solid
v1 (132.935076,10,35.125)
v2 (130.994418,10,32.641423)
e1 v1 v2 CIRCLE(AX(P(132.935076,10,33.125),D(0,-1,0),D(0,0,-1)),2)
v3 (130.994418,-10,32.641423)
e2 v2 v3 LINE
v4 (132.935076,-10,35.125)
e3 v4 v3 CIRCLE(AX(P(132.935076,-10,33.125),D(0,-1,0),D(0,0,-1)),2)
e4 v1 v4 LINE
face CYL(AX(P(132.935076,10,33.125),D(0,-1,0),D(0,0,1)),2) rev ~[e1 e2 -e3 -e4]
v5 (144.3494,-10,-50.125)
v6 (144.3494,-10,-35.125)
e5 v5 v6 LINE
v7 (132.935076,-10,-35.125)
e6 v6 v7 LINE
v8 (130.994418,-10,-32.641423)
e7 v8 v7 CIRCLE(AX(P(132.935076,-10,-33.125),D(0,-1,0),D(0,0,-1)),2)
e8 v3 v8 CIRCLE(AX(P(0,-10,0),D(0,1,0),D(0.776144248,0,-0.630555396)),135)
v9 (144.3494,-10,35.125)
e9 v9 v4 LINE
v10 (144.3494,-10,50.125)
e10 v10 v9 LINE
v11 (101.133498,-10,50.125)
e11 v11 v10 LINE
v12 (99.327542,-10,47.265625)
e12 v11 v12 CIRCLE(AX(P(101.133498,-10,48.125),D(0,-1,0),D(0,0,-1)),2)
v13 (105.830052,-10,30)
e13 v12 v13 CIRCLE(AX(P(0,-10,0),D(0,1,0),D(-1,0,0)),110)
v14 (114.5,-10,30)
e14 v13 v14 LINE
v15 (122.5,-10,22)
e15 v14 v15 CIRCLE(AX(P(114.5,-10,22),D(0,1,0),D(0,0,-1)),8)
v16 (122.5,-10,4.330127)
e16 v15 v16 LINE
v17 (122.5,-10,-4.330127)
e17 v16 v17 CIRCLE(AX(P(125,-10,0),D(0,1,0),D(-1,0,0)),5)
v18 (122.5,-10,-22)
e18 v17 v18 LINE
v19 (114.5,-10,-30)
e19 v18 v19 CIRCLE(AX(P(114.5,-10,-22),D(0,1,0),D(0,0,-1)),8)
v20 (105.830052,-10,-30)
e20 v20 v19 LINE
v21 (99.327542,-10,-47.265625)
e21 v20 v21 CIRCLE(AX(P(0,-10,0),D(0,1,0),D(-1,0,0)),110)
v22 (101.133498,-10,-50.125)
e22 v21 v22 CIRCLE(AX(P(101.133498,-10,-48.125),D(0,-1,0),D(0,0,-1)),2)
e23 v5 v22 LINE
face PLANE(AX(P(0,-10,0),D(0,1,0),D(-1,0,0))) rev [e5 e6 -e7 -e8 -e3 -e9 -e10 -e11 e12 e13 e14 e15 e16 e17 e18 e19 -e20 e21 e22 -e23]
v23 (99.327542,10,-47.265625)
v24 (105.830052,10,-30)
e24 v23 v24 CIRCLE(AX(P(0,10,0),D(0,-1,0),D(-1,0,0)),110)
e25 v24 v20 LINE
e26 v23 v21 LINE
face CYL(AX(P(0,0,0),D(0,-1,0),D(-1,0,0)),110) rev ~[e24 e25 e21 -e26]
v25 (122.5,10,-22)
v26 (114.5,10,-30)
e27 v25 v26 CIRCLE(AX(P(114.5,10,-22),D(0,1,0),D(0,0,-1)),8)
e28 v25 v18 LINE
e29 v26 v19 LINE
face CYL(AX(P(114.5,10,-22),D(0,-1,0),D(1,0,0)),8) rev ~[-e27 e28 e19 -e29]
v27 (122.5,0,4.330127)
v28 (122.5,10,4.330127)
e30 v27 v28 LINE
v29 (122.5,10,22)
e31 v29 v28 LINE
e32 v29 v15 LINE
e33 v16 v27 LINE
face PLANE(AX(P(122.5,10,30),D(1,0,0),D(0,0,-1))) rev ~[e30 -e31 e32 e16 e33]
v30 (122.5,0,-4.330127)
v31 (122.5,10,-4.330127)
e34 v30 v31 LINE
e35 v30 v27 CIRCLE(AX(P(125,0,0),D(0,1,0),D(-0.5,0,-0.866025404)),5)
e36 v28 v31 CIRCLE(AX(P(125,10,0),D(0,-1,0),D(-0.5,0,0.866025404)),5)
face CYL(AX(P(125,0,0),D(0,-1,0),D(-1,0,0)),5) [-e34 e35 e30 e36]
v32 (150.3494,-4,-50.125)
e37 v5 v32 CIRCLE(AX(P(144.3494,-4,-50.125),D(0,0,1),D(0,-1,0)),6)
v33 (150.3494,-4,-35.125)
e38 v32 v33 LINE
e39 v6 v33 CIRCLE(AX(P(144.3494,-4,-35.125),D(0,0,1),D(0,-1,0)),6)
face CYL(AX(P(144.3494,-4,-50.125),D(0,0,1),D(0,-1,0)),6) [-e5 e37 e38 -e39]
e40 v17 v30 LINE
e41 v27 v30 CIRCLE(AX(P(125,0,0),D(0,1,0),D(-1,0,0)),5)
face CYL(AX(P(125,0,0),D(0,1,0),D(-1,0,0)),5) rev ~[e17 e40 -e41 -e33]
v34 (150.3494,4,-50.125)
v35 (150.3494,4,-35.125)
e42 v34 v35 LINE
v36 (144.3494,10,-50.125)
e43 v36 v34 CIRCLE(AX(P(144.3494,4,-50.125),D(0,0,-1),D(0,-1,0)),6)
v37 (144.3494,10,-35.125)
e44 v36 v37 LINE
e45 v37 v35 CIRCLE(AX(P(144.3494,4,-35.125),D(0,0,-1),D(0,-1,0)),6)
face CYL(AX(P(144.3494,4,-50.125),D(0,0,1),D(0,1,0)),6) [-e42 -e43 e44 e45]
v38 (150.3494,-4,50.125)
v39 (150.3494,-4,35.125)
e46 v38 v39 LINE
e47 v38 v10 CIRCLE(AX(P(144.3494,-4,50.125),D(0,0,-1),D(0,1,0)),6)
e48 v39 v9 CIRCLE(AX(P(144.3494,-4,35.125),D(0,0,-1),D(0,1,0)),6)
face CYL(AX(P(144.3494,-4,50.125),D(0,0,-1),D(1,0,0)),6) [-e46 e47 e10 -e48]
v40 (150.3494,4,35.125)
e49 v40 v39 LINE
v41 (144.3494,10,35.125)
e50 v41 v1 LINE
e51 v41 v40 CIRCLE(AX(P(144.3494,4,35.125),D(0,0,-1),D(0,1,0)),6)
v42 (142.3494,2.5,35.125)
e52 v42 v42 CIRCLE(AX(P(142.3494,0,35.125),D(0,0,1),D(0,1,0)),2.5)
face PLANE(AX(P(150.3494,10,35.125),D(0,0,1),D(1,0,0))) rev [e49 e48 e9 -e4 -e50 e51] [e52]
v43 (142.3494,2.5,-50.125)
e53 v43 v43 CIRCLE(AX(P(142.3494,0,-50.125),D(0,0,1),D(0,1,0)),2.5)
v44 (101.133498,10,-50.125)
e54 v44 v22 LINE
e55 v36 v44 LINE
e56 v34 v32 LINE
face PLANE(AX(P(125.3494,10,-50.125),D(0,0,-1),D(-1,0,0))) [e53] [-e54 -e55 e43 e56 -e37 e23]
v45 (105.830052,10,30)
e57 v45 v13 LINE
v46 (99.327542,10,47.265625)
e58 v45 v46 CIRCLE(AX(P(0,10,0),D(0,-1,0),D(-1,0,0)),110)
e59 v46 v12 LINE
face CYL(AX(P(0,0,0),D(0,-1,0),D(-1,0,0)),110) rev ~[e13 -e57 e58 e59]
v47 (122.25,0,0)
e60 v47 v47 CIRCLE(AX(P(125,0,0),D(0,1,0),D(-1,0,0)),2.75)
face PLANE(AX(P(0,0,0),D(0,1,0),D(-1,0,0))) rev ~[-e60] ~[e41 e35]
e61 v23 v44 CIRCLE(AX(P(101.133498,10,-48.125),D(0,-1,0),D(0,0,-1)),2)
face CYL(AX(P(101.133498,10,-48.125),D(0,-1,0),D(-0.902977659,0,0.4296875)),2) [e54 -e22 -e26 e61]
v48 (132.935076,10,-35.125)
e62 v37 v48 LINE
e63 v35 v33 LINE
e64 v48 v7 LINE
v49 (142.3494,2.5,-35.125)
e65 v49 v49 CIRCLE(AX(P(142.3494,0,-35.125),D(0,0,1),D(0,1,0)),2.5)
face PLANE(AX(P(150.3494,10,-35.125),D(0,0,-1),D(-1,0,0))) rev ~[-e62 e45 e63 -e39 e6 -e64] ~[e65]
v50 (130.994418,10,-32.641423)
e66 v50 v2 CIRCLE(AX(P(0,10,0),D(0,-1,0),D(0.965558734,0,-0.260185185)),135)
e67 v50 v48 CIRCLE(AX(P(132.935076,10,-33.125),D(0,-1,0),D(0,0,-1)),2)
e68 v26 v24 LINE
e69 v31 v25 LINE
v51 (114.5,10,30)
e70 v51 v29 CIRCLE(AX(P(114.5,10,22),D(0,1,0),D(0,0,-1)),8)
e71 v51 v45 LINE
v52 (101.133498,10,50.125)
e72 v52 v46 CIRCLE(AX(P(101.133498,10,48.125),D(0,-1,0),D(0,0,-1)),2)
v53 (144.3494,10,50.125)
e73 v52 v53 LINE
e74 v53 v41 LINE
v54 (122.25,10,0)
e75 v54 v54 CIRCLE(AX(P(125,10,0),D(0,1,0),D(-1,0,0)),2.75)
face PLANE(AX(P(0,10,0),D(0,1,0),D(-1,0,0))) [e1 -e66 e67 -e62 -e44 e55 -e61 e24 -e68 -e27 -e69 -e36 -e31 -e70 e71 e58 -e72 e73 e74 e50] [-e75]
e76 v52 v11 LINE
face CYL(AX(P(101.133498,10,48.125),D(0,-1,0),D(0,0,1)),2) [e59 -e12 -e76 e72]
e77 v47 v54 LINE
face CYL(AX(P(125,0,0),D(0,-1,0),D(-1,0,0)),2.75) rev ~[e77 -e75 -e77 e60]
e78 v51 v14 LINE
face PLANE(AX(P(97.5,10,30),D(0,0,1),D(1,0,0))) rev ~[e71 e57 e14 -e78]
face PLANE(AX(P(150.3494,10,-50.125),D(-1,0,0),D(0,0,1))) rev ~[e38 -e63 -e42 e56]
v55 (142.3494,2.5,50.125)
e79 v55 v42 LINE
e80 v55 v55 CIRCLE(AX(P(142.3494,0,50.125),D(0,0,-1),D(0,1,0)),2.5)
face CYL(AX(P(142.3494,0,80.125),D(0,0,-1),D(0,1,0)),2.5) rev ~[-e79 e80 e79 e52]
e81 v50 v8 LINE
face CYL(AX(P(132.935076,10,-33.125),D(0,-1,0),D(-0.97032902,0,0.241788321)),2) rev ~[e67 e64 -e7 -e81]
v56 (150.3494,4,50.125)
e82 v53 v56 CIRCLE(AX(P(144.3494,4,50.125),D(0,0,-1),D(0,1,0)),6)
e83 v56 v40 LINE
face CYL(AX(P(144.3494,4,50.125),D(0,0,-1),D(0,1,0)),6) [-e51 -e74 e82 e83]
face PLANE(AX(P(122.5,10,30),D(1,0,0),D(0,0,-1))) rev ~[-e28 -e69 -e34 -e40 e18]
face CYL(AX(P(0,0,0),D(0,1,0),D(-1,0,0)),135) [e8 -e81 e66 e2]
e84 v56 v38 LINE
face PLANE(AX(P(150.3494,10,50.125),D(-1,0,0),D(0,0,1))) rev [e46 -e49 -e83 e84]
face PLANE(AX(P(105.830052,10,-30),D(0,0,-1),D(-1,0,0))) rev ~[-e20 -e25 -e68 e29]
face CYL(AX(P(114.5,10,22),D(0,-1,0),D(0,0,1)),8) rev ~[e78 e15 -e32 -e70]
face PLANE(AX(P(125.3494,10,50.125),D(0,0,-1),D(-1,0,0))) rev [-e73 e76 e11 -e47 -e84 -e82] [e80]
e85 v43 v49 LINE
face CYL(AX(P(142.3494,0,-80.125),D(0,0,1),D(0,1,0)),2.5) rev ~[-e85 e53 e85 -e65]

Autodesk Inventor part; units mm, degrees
ref_plane "YZ Plane" through (0, 0, 0) normal (1, 0, 0) x (0, 1, 0)
ref_plane "XZ Plane" through (0, 0, 0) normal (0, 1, 0) x (-1, 0, 0)
ref_plane "XY Plane" through (0, 0, 0) normal (0, 0, 1) x (1, 0, 0)
sketch "Sketch1" plane through (0, 0, 0) normal (0, 1, 0) x (-1, 0, 0)
  circle A0 centre (0, 0) radius 135
  circle A1 centre (0, 0) radius 110
  line L0 (0, 0) -> (-125, 0)
  line L1 (0, 0) -> (125, 0) construction
  circle A2 centre (-125, 0) radius 2.75
  circle A3 centre (-125, 0) radius 5
  dimension "d0" = 270
  dimension "d1" = 220
  dimension "d82" = 125
  dimension "d83" = 180
  dimension "d84" = 5.5
  dimension "d85" = 10
extrude "Extrusion1" add sketch "Sketch1" along normal mid plane 20 contours A0 | A2 | A3
sketch "Sketch4" plane through (0, 10, 0) normal (0, 1, 0) x (1, 0, 0)
  circle A0 centre (0, 0) radius 50.125
  circle A1 centre (0, 0) radius 135 projected
  circle A2 centre (0, 0) radius 110 projected
  line L0 (125.3494, 50.125) -> (150.3494, 50.125)
  line L1 (150.3494, 50.125) -> (150.3494, 35.125)
  line L2 (150.3494, 35.125) -> (125.3494, 35.125)
  line L3 (125.3494, 35.125) -> (125.3494, 50.125)
  line L4 (150.3494, 70.125) -> (104.7795, 70.125)
  line L5 (104.7795, 70.125) -> (104.7795, 85.125)
  line L6 (104.7795, 85.125) -> (150.3494, 85.125)
  line L7 (150.3494, 85.125) -> (150.3494, 70.125)
  line L8 (103.1497, 60.125) -> (138.3886, 60.125) construction
  point P0 (130.3504, 35.125)
  point P1 (115.3581, 70.125)
  dimension "d21" = 100.25
  dimension "d22" = 25
  dimension "d23" = 15
  dimension "d24" = 20
  dimension "d25" = 15
  dimension "d57" = 10
extrude "Extrusion3" add sketch "Sketch4" against normal up to surface (20 mm away) contours L6 L7 L4 A1 | A1 L0 L1 L2
fillet "Fillet1" radius 6 4 edges at (150.3494, 10, -77.625) (150.3494, -10, -77.625) (150.3494, -10, -42.625) (150.3494, 10, -42.625)
fillet "Fillet2" radius 10 1 edges at (104.7795, 0, -85.125)
fillet "Fillet3" radius 2 1 edges at (130.3504, 0, -35.125)
sketch "Sketch5" plane through (150.3494, -4, -85.125) normal (0, 0, -1) x (-1, 0, 0)
  line L0 (0, 8) -> (0, 0) projected
  line L1 (40.9135, -6) -> (6, -6) projected
  point P0 (150.3494, 4)
  point P1 (8, 4)
  point P2 (0, 4)
  dimension "d38" = 8
  dimension "d39" = 10
hole "Hole2" at (142.3494, 0, -85.125) direction (0, 0, 1) diameter 5 depth 50 counterbore diameter 8.5 counterbore depth 5
mirror "Mirror1" about plane through (0, 0, 0) normal (1, 0, 0) of "Extrusion3", "Fillet1", "Fillet2", "Fillet3", "Hole2"
mirror "Mirror2" about plane through (0, 0, 0) normal (0, 0, 1) of "Extrusion3", "Fillet1", "Fillet2", "Fillet3", "Hole2"
sketch "Sketch10" plane through (0, 10, 0) normal (0, 1, 0) x (1, 0, 0)
  line L0 (144.3494, 50.125) -> (125.3494, 50.125) projected
  line L1 (144.3494, -50.125) -> (125.3494, -50.125) projected
  line L2 (174.7146, 50.125) -> (75.699, 50.125)
  line L3 (75.699, 50.125) -> (75.699, -50.125)
  line L4 (75.699, -50.125) -> (174.7146, -50.125)
  line L5 (174.7146, 145.3293) -> (-157.7861, 145.3293)
  line L6 (-157.7861, 145.3293) -> (-157.7861, -141.1771)
  line L7 (-157.7861, -141.1771) -> (174.7146, -141.1771)
  line L8 (174.7146, -141.1771) -> (174.7146, -50.125)
  line L9 (174.7146, 50.125) -> (174.7146, 145.3293)
  point P0 (0, 0)
extrude "Extrusion7" cut sketch "Sketch10" against normal through all
fillet "Fillet7" radius 2 2 edges at (97.9157, 0, -50.125) (97.9157, 0, 50.125)
sketch "Sketch12" plane through (0, 10, 0) normal (0, 1, 0) x (1, 0, 0)
  circle A0 centre (0, 0) radius 110
  line L0 (122.5, 30) -> (97.5, 30)
  line L1 (97.5, 30) -> (97.5, -30)
  line L2 (97.5, -30) -> (122.5, -30)
  line L3 (122.5, -30) -> (122.5, 30)
  line L4 (122.5, 30) -> (97.5, -30) construction
  line L5 (97.5, 30) -> (122.5, -30) construction
  point P0 (110, 0)
  dimension "d68" = 25
  dimension "d69" = 60
extrude "Extrusion9" cut sketch "Sketch12" against normal up to surface (20 mm away) contours A0 L2 L1 L0 | A0 L0 L3 L2 picked at (101.6667, 0)
fillet "Fillet8" radius 8 2 edges at (122.5, 0, -30) (122.5, 0, 30)
extrude "Extrusion10" cut sketch "Sketch1" along normal mid plane 20 contours A2 | A3
extrude "Extrusion11" add sketch "Sketch1" along normal up to surface (10 mm away) contours A3
properties part number "Cylinder 80-20 Spacer_1 Slant"
